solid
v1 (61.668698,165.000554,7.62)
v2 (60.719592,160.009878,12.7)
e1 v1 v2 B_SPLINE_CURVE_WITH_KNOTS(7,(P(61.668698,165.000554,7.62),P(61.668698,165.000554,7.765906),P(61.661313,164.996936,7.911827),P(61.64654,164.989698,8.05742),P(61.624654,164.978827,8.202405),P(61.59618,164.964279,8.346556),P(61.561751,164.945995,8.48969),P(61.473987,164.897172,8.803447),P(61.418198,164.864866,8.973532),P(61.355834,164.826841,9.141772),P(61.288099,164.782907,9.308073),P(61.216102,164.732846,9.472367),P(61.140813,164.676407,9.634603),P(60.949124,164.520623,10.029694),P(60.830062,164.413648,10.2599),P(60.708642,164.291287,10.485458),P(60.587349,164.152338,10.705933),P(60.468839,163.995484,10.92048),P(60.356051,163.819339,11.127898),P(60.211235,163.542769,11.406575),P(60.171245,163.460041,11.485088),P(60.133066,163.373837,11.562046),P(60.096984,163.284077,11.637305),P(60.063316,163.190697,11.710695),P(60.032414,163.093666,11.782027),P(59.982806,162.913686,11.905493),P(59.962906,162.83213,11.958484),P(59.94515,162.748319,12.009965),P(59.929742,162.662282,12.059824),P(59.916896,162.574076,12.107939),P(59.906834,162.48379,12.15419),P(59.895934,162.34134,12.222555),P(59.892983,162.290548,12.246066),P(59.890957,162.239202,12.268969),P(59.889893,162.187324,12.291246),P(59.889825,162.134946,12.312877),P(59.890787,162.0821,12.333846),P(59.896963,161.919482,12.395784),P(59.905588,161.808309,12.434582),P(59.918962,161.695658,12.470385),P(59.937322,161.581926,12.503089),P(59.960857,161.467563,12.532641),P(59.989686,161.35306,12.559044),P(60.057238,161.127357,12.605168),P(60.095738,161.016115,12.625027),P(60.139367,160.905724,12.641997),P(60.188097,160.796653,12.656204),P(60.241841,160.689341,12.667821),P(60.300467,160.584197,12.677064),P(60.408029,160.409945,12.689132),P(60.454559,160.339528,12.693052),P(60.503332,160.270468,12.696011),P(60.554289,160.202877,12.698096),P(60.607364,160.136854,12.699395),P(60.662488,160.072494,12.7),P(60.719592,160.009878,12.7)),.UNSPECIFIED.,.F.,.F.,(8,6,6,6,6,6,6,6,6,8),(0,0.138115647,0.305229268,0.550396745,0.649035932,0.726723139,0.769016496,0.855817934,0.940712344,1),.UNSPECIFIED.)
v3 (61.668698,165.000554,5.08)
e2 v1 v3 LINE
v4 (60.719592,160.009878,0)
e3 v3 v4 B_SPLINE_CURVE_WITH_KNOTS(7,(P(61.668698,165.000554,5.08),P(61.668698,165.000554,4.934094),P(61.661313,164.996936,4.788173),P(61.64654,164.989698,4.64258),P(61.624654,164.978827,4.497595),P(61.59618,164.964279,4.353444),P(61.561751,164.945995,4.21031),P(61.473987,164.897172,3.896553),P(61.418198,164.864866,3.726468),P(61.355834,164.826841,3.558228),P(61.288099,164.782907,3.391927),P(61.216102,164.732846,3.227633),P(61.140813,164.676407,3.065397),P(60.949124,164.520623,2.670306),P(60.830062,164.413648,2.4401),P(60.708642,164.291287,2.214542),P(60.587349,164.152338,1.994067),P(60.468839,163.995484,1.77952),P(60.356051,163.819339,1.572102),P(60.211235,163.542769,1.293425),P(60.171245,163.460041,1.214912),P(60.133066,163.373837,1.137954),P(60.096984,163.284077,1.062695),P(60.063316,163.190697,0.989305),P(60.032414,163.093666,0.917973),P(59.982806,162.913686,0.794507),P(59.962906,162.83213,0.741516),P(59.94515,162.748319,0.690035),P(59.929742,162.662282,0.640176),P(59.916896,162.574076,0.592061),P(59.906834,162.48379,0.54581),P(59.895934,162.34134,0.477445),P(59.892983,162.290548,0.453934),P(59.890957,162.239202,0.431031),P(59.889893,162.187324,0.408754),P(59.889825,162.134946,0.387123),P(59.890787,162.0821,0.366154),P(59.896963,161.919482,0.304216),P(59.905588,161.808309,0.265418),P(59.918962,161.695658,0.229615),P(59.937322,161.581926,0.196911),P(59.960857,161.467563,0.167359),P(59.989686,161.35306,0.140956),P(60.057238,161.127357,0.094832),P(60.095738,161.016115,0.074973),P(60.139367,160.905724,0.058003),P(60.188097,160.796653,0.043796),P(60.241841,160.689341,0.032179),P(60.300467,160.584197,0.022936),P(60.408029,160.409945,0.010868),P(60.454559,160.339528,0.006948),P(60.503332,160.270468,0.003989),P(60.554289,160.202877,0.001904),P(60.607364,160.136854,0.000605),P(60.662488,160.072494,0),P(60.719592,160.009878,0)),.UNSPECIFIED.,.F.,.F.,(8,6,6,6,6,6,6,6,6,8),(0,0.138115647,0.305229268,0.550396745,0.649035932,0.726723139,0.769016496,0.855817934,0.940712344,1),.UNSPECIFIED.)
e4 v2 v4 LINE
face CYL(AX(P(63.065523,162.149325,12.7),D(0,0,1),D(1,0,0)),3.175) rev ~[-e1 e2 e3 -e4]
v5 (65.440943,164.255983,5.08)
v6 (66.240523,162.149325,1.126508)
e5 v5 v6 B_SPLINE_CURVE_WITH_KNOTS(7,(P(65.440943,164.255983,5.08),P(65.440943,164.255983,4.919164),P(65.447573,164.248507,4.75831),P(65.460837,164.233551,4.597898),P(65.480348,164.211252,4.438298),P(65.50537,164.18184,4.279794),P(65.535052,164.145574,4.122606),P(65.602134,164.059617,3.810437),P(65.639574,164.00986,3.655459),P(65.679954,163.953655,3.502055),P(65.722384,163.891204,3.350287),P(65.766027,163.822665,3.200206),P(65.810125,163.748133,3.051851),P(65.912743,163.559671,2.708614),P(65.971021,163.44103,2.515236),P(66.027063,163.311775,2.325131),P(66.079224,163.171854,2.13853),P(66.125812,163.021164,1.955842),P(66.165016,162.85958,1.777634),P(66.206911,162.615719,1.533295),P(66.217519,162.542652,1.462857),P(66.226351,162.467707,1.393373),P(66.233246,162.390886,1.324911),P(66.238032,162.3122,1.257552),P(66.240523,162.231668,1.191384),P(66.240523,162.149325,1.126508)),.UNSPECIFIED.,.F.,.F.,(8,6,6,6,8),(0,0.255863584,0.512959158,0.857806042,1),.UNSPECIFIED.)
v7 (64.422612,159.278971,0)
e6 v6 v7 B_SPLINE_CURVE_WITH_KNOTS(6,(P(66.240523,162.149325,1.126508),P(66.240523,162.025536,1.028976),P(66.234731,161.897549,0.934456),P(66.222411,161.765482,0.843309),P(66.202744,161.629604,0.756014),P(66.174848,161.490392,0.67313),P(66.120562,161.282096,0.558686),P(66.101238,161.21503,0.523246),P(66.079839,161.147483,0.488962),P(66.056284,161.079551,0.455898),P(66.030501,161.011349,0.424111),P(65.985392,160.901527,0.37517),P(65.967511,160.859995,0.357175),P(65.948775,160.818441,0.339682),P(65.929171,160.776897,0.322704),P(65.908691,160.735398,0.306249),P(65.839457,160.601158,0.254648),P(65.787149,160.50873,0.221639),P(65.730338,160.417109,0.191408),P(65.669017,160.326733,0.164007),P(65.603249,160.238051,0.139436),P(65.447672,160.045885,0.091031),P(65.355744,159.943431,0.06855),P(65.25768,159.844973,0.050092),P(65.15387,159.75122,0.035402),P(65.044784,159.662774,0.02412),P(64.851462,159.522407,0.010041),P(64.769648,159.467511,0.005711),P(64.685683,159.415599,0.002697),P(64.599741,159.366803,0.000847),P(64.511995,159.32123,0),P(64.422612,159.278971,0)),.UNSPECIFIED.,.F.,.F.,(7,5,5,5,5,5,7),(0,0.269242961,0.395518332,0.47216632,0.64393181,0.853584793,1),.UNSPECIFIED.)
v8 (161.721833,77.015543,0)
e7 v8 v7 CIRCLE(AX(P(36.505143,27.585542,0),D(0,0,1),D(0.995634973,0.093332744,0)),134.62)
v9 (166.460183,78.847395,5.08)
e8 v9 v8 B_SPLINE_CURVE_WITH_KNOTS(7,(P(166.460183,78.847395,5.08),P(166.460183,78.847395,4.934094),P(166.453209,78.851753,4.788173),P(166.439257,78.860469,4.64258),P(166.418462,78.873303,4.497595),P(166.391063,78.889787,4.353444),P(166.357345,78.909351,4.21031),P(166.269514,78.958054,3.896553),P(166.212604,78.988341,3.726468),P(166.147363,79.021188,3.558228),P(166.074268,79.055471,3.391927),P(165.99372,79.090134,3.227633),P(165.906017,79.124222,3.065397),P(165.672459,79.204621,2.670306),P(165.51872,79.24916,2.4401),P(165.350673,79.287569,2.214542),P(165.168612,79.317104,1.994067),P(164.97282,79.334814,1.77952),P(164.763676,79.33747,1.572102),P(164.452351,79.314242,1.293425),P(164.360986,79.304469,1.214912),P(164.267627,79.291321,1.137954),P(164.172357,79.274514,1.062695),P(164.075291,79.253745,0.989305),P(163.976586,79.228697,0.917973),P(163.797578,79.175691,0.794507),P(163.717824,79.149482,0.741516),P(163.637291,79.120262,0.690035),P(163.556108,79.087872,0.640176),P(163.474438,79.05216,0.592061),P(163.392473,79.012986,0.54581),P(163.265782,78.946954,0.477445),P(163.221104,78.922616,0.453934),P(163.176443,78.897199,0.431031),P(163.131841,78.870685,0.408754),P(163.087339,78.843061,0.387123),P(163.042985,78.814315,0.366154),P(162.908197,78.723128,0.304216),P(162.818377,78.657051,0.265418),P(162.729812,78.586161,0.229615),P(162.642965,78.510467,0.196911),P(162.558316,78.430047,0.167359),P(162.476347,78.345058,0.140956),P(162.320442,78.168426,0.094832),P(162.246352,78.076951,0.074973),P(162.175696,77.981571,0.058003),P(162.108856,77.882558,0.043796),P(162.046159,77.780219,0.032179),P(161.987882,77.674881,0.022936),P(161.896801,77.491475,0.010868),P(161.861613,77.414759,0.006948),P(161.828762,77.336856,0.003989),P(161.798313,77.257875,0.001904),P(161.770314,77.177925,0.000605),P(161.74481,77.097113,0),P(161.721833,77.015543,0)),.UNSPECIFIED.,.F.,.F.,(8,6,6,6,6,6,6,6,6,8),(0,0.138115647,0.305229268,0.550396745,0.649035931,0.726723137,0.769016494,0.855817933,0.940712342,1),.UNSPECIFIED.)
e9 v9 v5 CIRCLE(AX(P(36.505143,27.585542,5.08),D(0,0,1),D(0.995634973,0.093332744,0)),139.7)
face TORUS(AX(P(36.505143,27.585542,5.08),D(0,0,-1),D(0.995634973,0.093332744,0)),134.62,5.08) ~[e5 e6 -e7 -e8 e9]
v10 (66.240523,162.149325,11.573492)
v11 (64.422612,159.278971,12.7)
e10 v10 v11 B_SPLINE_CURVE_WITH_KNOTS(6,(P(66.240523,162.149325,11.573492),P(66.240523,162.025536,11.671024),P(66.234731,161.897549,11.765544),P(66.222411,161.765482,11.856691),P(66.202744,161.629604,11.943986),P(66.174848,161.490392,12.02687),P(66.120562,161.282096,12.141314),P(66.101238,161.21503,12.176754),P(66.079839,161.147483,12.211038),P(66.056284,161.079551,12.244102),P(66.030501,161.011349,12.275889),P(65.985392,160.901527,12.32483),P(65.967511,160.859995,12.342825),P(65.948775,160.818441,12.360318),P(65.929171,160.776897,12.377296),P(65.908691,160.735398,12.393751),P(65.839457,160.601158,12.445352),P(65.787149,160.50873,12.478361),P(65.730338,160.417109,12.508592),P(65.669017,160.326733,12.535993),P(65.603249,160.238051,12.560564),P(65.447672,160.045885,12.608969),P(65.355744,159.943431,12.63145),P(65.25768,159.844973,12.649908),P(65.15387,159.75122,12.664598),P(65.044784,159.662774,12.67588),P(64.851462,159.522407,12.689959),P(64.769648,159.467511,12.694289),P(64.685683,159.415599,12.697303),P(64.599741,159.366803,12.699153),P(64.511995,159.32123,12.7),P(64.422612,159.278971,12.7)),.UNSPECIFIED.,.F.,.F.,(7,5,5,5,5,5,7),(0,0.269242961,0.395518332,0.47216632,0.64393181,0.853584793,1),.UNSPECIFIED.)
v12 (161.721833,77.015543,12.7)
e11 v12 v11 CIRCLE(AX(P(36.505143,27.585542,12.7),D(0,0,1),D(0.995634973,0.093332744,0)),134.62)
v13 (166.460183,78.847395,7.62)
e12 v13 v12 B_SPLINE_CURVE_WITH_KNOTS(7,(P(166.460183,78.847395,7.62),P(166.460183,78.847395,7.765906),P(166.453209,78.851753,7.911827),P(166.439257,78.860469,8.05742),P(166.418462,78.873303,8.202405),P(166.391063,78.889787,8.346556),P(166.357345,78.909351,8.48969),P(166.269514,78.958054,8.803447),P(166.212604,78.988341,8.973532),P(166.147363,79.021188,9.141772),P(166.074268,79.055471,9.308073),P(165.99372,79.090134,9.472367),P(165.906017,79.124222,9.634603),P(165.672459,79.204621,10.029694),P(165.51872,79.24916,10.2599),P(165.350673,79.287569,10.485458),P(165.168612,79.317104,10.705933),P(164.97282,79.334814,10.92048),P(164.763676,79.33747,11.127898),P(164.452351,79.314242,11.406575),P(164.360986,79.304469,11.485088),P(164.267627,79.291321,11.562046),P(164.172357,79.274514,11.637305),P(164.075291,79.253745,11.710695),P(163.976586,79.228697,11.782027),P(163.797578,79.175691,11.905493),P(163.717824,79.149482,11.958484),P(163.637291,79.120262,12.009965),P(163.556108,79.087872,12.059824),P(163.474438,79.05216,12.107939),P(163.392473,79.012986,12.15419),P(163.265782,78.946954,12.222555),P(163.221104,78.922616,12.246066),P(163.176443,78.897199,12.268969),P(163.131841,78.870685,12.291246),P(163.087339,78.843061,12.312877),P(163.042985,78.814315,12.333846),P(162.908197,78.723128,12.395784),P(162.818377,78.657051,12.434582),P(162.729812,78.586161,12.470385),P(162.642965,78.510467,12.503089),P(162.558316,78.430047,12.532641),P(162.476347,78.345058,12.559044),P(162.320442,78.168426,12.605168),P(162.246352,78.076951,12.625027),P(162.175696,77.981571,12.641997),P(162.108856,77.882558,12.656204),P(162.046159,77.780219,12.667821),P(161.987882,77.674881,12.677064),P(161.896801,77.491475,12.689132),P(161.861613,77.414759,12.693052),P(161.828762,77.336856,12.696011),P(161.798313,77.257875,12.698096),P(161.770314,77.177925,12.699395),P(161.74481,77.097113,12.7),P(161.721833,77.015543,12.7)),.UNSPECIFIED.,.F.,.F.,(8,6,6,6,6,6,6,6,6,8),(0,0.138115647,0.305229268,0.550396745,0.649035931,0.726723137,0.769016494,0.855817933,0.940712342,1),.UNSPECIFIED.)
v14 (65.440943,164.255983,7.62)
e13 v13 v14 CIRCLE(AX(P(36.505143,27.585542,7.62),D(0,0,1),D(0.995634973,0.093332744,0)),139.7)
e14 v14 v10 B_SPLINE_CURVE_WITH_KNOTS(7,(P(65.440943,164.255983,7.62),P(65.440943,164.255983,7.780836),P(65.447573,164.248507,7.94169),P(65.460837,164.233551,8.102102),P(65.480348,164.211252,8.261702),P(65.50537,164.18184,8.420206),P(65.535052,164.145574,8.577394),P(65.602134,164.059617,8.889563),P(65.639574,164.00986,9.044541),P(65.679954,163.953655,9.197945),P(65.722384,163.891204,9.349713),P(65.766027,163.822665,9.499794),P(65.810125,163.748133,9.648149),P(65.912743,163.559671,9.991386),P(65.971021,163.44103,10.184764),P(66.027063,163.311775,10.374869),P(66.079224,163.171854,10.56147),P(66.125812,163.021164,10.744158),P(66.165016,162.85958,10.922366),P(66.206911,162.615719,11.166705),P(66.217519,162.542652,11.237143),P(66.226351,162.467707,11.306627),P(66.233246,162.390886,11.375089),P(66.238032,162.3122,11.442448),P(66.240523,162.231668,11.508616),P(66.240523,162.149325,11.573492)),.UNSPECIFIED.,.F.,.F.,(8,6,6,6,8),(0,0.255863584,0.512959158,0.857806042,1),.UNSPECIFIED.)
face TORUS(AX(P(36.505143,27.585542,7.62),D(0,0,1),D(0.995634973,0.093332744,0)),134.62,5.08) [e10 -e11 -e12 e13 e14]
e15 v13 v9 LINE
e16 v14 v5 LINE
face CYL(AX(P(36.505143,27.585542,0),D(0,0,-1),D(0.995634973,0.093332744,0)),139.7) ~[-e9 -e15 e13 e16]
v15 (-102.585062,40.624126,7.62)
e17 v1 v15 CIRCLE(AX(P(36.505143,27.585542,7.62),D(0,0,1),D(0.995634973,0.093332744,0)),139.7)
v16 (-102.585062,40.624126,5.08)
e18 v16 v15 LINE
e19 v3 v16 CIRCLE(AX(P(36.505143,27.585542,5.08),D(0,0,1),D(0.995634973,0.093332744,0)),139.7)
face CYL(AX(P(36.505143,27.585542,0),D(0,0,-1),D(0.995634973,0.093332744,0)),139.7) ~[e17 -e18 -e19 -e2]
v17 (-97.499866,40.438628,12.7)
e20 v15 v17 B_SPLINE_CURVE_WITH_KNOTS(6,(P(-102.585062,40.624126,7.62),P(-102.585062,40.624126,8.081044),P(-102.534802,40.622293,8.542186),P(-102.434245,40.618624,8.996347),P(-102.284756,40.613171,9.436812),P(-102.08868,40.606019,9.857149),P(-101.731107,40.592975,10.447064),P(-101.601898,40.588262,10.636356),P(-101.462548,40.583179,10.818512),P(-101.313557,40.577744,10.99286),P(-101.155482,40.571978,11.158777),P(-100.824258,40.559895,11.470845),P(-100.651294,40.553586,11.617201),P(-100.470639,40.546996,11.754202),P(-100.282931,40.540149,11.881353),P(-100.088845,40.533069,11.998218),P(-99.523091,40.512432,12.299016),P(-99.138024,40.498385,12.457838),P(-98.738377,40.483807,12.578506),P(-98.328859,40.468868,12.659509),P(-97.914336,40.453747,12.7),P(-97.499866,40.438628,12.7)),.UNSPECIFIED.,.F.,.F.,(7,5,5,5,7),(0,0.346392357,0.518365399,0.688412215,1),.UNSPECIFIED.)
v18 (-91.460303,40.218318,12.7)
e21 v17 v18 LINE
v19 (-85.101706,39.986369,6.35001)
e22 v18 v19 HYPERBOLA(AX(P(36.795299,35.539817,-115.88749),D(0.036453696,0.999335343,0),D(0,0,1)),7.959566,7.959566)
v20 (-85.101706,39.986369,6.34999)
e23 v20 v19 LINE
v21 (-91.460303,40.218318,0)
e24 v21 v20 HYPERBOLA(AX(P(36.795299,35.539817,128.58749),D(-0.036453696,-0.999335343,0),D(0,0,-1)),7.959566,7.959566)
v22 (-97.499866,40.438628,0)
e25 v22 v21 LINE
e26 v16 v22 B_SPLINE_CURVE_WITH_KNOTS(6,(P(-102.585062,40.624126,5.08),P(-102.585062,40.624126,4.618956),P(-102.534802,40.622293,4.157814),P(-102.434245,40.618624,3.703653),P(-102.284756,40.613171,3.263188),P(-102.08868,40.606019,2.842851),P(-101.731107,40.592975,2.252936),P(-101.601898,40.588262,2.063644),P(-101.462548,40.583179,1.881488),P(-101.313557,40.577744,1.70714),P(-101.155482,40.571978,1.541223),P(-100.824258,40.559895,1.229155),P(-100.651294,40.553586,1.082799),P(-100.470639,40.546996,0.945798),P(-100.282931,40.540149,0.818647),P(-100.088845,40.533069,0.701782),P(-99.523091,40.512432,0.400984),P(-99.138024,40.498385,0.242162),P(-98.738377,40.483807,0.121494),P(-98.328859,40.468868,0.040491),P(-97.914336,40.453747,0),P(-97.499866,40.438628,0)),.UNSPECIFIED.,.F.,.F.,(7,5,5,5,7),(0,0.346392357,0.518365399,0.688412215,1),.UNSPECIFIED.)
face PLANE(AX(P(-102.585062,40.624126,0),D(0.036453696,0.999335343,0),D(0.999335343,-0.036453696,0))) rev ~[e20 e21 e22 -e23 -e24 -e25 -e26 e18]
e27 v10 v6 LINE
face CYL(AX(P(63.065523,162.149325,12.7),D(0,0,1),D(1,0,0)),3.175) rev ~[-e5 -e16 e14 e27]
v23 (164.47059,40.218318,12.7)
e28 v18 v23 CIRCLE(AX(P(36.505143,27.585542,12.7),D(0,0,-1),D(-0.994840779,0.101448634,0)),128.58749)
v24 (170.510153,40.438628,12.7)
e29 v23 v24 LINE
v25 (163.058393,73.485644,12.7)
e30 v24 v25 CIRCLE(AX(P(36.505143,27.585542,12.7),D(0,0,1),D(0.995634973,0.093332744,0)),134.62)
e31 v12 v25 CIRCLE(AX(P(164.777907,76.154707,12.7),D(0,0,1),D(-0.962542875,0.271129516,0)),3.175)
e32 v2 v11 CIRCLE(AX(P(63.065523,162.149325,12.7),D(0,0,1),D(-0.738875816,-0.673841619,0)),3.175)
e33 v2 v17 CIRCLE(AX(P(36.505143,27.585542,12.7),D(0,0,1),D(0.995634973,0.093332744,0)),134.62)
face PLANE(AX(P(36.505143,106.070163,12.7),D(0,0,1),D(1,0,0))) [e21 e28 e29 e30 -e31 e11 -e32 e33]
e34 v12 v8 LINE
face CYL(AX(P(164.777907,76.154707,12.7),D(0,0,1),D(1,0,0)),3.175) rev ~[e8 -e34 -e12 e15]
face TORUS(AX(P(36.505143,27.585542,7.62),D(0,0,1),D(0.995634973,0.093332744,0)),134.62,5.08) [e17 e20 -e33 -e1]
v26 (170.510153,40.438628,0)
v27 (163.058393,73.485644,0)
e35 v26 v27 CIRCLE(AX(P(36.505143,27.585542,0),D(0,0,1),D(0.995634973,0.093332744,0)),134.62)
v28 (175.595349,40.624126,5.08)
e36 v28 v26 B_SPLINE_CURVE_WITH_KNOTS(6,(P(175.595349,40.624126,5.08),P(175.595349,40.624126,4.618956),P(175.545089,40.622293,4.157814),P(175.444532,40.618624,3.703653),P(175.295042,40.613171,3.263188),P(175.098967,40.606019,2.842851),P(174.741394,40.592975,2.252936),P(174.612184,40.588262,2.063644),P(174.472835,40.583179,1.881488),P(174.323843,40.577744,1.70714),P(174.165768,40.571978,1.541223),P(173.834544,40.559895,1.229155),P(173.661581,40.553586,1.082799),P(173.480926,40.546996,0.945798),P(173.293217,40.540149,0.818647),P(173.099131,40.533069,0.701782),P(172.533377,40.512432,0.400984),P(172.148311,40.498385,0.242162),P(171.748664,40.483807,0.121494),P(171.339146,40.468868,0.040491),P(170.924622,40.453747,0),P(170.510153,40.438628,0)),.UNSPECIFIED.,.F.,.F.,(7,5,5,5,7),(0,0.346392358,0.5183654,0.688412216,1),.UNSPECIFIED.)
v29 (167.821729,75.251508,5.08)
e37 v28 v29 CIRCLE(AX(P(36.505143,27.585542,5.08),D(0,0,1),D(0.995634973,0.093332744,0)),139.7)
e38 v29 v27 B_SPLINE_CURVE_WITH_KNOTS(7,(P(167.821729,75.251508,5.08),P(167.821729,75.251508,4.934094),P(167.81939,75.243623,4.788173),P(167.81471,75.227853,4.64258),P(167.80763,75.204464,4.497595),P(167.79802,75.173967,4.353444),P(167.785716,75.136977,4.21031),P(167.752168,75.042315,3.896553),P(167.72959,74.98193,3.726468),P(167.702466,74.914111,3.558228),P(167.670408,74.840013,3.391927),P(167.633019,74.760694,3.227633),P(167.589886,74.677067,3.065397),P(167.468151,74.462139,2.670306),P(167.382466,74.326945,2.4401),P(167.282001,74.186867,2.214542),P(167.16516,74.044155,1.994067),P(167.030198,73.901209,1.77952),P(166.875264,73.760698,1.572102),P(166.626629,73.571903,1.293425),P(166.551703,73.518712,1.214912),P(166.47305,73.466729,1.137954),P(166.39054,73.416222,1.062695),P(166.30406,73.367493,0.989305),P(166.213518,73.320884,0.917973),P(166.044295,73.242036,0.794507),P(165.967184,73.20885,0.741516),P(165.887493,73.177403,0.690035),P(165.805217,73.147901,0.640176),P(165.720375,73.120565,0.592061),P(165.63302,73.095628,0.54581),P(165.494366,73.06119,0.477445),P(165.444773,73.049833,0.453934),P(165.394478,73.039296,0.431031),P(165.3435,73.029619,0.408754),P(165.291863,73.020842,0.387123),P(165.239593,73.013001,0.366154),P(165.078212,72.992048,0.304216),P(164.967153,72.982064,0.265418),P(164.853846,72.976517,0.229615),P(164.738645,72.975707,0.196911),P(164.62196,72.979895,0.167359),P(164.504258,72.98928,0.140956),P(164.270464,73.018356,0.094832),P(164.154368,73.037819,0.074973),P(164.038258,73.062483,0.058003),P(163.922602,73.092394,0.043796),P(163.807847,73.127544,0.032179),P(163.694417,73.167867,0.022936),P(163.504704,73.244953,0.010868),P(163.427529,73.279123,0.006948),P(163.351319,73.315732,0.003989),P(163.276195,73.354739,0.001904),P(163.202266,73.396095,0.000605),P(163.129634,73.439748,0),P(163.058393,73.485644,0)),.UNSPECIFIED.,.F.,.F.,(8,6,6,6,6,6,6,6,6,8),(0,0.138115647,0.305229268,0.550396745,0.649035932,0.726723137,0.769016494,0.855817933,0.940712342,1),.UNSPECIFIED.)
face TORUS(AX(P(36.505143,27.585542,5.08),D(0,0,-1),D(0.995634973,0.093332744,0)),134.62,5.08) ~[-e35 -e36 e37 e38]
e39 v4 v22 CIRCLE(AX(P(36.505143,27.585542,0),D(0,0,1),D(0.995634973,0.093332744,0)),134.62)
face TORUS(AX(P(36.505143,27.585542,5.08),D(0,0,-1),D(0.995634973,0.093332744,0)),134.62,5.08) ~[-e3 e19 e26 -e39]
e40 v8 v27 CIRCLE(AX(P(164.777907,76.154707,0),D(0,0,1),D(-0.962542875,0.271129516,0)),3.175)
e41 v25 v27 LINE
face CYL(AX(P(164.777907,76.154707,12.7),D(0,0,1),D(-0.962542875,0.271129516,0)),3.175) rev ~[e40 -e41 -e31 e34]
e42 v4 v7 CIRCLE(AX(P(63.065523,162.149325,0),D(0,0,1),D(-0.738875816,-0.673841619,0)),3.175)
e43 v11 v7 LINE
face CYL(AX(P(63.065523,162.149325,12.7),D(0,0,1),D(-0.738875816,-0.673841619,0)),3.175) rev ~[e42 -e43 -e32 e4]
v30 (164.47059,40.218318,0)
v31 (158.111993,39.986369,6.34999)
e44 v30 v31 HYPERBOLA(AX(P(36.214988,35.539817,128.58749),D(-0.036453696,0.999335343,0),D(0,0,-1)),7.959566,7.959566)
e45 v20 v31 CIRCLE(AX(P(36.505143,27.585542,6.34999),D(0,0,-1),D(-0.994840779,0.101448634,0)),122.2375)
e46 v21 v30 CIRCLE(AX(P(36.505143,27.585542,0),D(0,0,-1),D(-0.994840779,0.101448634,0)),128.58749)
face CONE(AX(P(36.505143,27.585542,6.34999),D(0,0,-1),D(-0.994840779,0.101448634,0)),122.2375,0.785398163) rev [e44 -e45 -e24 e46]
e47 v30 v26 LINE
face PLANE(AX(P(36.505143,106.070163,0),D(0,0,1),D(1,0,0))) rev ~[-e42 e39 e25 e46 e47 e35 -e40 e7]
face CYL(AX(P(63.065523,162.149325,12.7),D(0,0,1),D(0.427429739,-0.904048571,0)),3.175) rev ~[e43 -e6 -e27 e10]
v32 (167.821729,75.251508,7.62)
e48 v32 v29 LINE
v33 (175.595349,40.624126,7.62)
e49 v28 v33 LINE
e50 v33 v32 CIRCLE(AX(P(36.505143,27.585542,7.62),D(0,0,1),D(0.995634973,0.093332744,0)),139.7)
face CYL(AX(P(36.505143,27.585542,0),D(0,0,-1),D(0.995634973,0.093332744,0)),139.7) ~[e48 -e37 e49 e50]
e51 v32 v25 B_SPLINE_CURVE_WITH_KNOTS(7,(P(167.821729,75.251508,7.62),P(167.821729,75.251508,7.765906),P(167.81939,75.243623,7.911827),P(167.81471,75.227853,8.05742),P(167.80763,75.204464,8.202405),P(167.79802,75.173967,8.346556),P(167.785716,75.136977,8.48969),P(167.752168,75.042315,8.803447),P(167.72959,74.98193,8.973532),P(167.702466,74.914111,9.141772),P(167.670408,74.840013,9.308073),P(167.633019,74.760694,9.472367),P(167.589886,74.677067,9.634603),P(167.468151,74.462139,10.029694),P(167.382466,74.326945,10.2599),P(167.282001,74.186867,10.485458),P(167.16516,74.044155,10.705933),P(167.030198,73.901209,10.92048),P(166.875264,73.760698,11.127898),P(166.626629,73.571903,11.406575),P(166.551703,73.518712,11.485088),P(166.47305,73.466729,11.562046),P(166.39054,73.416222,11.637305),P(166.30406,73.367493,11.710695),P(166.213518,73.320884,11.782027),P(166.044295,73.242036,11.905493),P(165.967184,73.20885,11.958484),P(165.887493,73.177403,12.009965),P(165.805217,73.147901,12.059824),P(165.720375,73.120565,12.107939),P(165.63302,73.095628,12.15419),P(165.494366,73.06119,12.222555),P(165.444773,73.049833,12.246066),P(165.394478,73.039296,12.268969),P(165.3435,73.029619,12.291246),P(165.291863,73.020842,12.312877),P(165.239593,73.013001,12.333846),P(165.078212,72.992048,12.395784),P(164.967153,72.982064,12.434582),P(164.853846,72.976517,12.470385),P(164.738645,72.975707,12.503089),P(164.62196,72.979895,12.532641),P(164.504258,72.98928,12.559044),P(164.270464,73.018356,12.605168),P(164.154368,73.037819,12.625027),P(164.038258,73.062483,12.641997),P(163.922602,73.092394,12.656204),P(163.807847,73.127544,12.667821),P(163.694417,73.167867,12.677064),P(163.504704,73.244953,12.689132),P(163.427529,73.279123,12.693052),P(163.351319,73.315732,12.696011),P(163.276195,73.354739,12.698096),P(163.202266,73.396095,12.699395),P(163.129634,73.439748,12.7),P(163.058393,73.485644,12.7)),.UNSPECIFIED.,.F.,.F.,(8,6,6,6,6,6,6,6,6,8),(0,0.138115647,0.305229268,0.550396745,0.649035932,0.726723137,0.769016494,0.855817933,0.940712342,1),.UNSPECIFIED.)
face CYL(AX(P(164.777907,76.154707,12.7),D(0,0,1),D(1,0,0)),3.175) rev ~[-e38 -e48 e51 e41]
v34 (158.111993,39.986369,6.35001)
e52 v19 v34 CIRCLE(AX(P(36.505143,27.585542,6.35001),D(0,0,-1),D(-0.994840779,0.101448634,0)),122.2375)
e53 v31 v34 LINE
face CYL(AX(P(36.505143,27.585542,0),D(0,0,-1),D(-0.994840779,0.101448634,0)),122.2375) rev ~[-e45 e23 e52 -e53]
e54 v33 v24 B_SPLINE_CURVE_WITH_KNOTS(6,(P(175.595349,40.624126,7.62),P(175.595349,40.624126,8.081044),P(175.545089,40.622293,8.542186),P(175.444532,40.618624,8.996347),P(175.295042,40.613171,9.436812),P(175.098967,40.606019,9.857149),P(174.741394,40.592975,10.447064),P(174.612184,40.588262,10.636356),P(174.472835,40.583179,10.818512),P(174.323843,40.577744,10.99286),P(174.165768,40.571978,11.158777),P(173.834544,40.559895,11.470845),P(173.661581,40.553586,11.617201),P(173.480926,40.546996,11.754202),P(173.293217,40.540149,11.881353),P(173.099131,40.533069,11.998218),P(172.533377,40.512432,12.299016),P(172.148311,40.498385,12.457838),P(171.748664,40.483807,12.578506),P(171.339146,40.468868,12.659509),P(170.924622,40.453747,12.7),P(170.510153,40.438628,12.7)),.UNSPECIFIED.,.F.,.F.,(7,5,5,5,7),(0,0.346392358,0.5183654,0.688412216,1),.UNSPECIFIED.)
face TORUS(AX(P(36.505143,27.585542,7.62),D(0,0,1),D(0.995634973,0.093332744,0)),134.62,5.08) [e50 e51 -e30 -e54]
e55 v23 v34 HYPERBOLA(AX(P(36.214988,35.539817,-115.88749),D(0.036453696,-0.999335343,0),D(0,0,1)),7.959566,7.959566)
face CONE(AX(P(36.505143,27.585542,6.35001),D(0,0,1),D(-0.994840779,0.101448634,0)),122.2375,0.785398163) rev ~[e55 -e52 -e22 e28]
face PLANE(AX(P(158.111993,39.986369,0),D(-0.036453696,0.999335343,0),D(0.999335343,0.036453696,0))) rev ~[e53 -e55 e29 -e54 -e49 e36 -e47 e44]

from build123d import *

# Parameters (mm, degrees)
F1_DEPTH  = 12.7
F2_R      = 5.08
F3_SIZE   = 6.34999
F7_DEPTH  = 25.4
F9_DEPTH  = 25.4
F6_R      = 3.175
F10_DEPTH = 25.4


# Not quite as in the source:
# - a fillet or chamfer is up to 0.001 mm smaller than in the source, because OpenCascade refuses the exact size


with BuildPart() as f1:
    # F0 (on Top) → F1 (new body)
    with BuildSketch(Plane.XY):
        with BuildLine():
            ThreePointArc((-85.1017062912, 39.9863691127), (36.5051433715, 149.8230416662), (158.1119930343, 39.9863691127))
            Line((158.1119930343, 39.9863691127), (175.5953490648, 40.6241259528))
            ThreePointArc((175.5953490648, 40.6241259528), (36.5051433715, 167.2855416662), (-102.5850623217, 40.6241259528))
            Line((-102.5850623217, 40.6241259528), (-85.1017062912, 39.9863691127))
        make_face()
    extrude(amount=F1_DEPTH)

    # F2
    f2_edges = [f1.edges().sort_by_distance(p)[0] for p in [
        (36.505143, 167.285542, 12.7),
        (36.505143, 167.285542, 0),
    ]]
    fillet(f2_edges, radius=F2_R)

    # F3 (size 6.35 in the source; OpenCascade refuses exactly that, so slightly less here)
    f3_edges = [f1.edges().sort_by_distance(p)[0] for p in [
        (36.505143, 149.823042, 12.7),
        (36.505143, 149.823042, 0),
    ]]
    chamfer(f3_edges, length=F3_SIZE)


with BuildPart() as f4_1:
    # F4: instance of F1
    add(f1.part.mirror(Plane.XY))


with BuildPart() as f1_1:
    add(f1.part)

    # F6 (on face) → F7 (cut)
    with BuildSketch(Plane.XY.offset(12.7)):
        with BuildLine():
            ThreePointArc((163.0583931619, 73.4856437086), (162.4024850501, 75.2552779595), (161.7218329639, 77.0155431585))
            ThreePointArc((161.7218329639, 77.0155431585), (161.8086296648, 75.0304207129), (163.0583931619, 73.4856437086))
        make_face()
    extrude(amount=-F7_DEPTH, mode=Mode.SUBTRACT)

    # F8 (on face) → F9 (cut)
    with BuildSketch(Plane.XY.offset(12.7)):
        with BuildLine():
            ThreePointArc((64.4226124591, 159.2789709622), (62.573664155, 159.6574032574), (60.7195923208, 160.0098780326))
            ThreePointArc((60.7195923208, 160.0098780326), (62.4506994343, 159.0344227782), (64.4226124591, 159.2789709622))
        make_face()
        with BuildLine():
            ThreePointArc((64.4226124591, 159.2789709622), (65.7478153328, 160.450521759), (66.2405230377, 162.1493251742))
            ThreePointArc((66.2405230377, 162.1493251742), (61.9182883246, 165.1098112007), (60.7195923208, 160.0098780326))
            ThreePointArc((60.7195923208, 160.0098780326), (62.573664155, 159.6574032574), (64.4226124591, 159.2789709622))
        make_face()
    extrude(amount=-F9_DEPTH, mode=Mode.SUBTRACT)

    # F6 (on face) → F10 (cut)
    with BuildSketch(Plane.XY.offset(12.7)):
        with Locations((164.7779065912, 76.1547069462)):
            Circle(F6_R)
    extrude(amount=-F10_DEPTH, mode=Mode.SUBTRACT)


solid = f1_1.part
